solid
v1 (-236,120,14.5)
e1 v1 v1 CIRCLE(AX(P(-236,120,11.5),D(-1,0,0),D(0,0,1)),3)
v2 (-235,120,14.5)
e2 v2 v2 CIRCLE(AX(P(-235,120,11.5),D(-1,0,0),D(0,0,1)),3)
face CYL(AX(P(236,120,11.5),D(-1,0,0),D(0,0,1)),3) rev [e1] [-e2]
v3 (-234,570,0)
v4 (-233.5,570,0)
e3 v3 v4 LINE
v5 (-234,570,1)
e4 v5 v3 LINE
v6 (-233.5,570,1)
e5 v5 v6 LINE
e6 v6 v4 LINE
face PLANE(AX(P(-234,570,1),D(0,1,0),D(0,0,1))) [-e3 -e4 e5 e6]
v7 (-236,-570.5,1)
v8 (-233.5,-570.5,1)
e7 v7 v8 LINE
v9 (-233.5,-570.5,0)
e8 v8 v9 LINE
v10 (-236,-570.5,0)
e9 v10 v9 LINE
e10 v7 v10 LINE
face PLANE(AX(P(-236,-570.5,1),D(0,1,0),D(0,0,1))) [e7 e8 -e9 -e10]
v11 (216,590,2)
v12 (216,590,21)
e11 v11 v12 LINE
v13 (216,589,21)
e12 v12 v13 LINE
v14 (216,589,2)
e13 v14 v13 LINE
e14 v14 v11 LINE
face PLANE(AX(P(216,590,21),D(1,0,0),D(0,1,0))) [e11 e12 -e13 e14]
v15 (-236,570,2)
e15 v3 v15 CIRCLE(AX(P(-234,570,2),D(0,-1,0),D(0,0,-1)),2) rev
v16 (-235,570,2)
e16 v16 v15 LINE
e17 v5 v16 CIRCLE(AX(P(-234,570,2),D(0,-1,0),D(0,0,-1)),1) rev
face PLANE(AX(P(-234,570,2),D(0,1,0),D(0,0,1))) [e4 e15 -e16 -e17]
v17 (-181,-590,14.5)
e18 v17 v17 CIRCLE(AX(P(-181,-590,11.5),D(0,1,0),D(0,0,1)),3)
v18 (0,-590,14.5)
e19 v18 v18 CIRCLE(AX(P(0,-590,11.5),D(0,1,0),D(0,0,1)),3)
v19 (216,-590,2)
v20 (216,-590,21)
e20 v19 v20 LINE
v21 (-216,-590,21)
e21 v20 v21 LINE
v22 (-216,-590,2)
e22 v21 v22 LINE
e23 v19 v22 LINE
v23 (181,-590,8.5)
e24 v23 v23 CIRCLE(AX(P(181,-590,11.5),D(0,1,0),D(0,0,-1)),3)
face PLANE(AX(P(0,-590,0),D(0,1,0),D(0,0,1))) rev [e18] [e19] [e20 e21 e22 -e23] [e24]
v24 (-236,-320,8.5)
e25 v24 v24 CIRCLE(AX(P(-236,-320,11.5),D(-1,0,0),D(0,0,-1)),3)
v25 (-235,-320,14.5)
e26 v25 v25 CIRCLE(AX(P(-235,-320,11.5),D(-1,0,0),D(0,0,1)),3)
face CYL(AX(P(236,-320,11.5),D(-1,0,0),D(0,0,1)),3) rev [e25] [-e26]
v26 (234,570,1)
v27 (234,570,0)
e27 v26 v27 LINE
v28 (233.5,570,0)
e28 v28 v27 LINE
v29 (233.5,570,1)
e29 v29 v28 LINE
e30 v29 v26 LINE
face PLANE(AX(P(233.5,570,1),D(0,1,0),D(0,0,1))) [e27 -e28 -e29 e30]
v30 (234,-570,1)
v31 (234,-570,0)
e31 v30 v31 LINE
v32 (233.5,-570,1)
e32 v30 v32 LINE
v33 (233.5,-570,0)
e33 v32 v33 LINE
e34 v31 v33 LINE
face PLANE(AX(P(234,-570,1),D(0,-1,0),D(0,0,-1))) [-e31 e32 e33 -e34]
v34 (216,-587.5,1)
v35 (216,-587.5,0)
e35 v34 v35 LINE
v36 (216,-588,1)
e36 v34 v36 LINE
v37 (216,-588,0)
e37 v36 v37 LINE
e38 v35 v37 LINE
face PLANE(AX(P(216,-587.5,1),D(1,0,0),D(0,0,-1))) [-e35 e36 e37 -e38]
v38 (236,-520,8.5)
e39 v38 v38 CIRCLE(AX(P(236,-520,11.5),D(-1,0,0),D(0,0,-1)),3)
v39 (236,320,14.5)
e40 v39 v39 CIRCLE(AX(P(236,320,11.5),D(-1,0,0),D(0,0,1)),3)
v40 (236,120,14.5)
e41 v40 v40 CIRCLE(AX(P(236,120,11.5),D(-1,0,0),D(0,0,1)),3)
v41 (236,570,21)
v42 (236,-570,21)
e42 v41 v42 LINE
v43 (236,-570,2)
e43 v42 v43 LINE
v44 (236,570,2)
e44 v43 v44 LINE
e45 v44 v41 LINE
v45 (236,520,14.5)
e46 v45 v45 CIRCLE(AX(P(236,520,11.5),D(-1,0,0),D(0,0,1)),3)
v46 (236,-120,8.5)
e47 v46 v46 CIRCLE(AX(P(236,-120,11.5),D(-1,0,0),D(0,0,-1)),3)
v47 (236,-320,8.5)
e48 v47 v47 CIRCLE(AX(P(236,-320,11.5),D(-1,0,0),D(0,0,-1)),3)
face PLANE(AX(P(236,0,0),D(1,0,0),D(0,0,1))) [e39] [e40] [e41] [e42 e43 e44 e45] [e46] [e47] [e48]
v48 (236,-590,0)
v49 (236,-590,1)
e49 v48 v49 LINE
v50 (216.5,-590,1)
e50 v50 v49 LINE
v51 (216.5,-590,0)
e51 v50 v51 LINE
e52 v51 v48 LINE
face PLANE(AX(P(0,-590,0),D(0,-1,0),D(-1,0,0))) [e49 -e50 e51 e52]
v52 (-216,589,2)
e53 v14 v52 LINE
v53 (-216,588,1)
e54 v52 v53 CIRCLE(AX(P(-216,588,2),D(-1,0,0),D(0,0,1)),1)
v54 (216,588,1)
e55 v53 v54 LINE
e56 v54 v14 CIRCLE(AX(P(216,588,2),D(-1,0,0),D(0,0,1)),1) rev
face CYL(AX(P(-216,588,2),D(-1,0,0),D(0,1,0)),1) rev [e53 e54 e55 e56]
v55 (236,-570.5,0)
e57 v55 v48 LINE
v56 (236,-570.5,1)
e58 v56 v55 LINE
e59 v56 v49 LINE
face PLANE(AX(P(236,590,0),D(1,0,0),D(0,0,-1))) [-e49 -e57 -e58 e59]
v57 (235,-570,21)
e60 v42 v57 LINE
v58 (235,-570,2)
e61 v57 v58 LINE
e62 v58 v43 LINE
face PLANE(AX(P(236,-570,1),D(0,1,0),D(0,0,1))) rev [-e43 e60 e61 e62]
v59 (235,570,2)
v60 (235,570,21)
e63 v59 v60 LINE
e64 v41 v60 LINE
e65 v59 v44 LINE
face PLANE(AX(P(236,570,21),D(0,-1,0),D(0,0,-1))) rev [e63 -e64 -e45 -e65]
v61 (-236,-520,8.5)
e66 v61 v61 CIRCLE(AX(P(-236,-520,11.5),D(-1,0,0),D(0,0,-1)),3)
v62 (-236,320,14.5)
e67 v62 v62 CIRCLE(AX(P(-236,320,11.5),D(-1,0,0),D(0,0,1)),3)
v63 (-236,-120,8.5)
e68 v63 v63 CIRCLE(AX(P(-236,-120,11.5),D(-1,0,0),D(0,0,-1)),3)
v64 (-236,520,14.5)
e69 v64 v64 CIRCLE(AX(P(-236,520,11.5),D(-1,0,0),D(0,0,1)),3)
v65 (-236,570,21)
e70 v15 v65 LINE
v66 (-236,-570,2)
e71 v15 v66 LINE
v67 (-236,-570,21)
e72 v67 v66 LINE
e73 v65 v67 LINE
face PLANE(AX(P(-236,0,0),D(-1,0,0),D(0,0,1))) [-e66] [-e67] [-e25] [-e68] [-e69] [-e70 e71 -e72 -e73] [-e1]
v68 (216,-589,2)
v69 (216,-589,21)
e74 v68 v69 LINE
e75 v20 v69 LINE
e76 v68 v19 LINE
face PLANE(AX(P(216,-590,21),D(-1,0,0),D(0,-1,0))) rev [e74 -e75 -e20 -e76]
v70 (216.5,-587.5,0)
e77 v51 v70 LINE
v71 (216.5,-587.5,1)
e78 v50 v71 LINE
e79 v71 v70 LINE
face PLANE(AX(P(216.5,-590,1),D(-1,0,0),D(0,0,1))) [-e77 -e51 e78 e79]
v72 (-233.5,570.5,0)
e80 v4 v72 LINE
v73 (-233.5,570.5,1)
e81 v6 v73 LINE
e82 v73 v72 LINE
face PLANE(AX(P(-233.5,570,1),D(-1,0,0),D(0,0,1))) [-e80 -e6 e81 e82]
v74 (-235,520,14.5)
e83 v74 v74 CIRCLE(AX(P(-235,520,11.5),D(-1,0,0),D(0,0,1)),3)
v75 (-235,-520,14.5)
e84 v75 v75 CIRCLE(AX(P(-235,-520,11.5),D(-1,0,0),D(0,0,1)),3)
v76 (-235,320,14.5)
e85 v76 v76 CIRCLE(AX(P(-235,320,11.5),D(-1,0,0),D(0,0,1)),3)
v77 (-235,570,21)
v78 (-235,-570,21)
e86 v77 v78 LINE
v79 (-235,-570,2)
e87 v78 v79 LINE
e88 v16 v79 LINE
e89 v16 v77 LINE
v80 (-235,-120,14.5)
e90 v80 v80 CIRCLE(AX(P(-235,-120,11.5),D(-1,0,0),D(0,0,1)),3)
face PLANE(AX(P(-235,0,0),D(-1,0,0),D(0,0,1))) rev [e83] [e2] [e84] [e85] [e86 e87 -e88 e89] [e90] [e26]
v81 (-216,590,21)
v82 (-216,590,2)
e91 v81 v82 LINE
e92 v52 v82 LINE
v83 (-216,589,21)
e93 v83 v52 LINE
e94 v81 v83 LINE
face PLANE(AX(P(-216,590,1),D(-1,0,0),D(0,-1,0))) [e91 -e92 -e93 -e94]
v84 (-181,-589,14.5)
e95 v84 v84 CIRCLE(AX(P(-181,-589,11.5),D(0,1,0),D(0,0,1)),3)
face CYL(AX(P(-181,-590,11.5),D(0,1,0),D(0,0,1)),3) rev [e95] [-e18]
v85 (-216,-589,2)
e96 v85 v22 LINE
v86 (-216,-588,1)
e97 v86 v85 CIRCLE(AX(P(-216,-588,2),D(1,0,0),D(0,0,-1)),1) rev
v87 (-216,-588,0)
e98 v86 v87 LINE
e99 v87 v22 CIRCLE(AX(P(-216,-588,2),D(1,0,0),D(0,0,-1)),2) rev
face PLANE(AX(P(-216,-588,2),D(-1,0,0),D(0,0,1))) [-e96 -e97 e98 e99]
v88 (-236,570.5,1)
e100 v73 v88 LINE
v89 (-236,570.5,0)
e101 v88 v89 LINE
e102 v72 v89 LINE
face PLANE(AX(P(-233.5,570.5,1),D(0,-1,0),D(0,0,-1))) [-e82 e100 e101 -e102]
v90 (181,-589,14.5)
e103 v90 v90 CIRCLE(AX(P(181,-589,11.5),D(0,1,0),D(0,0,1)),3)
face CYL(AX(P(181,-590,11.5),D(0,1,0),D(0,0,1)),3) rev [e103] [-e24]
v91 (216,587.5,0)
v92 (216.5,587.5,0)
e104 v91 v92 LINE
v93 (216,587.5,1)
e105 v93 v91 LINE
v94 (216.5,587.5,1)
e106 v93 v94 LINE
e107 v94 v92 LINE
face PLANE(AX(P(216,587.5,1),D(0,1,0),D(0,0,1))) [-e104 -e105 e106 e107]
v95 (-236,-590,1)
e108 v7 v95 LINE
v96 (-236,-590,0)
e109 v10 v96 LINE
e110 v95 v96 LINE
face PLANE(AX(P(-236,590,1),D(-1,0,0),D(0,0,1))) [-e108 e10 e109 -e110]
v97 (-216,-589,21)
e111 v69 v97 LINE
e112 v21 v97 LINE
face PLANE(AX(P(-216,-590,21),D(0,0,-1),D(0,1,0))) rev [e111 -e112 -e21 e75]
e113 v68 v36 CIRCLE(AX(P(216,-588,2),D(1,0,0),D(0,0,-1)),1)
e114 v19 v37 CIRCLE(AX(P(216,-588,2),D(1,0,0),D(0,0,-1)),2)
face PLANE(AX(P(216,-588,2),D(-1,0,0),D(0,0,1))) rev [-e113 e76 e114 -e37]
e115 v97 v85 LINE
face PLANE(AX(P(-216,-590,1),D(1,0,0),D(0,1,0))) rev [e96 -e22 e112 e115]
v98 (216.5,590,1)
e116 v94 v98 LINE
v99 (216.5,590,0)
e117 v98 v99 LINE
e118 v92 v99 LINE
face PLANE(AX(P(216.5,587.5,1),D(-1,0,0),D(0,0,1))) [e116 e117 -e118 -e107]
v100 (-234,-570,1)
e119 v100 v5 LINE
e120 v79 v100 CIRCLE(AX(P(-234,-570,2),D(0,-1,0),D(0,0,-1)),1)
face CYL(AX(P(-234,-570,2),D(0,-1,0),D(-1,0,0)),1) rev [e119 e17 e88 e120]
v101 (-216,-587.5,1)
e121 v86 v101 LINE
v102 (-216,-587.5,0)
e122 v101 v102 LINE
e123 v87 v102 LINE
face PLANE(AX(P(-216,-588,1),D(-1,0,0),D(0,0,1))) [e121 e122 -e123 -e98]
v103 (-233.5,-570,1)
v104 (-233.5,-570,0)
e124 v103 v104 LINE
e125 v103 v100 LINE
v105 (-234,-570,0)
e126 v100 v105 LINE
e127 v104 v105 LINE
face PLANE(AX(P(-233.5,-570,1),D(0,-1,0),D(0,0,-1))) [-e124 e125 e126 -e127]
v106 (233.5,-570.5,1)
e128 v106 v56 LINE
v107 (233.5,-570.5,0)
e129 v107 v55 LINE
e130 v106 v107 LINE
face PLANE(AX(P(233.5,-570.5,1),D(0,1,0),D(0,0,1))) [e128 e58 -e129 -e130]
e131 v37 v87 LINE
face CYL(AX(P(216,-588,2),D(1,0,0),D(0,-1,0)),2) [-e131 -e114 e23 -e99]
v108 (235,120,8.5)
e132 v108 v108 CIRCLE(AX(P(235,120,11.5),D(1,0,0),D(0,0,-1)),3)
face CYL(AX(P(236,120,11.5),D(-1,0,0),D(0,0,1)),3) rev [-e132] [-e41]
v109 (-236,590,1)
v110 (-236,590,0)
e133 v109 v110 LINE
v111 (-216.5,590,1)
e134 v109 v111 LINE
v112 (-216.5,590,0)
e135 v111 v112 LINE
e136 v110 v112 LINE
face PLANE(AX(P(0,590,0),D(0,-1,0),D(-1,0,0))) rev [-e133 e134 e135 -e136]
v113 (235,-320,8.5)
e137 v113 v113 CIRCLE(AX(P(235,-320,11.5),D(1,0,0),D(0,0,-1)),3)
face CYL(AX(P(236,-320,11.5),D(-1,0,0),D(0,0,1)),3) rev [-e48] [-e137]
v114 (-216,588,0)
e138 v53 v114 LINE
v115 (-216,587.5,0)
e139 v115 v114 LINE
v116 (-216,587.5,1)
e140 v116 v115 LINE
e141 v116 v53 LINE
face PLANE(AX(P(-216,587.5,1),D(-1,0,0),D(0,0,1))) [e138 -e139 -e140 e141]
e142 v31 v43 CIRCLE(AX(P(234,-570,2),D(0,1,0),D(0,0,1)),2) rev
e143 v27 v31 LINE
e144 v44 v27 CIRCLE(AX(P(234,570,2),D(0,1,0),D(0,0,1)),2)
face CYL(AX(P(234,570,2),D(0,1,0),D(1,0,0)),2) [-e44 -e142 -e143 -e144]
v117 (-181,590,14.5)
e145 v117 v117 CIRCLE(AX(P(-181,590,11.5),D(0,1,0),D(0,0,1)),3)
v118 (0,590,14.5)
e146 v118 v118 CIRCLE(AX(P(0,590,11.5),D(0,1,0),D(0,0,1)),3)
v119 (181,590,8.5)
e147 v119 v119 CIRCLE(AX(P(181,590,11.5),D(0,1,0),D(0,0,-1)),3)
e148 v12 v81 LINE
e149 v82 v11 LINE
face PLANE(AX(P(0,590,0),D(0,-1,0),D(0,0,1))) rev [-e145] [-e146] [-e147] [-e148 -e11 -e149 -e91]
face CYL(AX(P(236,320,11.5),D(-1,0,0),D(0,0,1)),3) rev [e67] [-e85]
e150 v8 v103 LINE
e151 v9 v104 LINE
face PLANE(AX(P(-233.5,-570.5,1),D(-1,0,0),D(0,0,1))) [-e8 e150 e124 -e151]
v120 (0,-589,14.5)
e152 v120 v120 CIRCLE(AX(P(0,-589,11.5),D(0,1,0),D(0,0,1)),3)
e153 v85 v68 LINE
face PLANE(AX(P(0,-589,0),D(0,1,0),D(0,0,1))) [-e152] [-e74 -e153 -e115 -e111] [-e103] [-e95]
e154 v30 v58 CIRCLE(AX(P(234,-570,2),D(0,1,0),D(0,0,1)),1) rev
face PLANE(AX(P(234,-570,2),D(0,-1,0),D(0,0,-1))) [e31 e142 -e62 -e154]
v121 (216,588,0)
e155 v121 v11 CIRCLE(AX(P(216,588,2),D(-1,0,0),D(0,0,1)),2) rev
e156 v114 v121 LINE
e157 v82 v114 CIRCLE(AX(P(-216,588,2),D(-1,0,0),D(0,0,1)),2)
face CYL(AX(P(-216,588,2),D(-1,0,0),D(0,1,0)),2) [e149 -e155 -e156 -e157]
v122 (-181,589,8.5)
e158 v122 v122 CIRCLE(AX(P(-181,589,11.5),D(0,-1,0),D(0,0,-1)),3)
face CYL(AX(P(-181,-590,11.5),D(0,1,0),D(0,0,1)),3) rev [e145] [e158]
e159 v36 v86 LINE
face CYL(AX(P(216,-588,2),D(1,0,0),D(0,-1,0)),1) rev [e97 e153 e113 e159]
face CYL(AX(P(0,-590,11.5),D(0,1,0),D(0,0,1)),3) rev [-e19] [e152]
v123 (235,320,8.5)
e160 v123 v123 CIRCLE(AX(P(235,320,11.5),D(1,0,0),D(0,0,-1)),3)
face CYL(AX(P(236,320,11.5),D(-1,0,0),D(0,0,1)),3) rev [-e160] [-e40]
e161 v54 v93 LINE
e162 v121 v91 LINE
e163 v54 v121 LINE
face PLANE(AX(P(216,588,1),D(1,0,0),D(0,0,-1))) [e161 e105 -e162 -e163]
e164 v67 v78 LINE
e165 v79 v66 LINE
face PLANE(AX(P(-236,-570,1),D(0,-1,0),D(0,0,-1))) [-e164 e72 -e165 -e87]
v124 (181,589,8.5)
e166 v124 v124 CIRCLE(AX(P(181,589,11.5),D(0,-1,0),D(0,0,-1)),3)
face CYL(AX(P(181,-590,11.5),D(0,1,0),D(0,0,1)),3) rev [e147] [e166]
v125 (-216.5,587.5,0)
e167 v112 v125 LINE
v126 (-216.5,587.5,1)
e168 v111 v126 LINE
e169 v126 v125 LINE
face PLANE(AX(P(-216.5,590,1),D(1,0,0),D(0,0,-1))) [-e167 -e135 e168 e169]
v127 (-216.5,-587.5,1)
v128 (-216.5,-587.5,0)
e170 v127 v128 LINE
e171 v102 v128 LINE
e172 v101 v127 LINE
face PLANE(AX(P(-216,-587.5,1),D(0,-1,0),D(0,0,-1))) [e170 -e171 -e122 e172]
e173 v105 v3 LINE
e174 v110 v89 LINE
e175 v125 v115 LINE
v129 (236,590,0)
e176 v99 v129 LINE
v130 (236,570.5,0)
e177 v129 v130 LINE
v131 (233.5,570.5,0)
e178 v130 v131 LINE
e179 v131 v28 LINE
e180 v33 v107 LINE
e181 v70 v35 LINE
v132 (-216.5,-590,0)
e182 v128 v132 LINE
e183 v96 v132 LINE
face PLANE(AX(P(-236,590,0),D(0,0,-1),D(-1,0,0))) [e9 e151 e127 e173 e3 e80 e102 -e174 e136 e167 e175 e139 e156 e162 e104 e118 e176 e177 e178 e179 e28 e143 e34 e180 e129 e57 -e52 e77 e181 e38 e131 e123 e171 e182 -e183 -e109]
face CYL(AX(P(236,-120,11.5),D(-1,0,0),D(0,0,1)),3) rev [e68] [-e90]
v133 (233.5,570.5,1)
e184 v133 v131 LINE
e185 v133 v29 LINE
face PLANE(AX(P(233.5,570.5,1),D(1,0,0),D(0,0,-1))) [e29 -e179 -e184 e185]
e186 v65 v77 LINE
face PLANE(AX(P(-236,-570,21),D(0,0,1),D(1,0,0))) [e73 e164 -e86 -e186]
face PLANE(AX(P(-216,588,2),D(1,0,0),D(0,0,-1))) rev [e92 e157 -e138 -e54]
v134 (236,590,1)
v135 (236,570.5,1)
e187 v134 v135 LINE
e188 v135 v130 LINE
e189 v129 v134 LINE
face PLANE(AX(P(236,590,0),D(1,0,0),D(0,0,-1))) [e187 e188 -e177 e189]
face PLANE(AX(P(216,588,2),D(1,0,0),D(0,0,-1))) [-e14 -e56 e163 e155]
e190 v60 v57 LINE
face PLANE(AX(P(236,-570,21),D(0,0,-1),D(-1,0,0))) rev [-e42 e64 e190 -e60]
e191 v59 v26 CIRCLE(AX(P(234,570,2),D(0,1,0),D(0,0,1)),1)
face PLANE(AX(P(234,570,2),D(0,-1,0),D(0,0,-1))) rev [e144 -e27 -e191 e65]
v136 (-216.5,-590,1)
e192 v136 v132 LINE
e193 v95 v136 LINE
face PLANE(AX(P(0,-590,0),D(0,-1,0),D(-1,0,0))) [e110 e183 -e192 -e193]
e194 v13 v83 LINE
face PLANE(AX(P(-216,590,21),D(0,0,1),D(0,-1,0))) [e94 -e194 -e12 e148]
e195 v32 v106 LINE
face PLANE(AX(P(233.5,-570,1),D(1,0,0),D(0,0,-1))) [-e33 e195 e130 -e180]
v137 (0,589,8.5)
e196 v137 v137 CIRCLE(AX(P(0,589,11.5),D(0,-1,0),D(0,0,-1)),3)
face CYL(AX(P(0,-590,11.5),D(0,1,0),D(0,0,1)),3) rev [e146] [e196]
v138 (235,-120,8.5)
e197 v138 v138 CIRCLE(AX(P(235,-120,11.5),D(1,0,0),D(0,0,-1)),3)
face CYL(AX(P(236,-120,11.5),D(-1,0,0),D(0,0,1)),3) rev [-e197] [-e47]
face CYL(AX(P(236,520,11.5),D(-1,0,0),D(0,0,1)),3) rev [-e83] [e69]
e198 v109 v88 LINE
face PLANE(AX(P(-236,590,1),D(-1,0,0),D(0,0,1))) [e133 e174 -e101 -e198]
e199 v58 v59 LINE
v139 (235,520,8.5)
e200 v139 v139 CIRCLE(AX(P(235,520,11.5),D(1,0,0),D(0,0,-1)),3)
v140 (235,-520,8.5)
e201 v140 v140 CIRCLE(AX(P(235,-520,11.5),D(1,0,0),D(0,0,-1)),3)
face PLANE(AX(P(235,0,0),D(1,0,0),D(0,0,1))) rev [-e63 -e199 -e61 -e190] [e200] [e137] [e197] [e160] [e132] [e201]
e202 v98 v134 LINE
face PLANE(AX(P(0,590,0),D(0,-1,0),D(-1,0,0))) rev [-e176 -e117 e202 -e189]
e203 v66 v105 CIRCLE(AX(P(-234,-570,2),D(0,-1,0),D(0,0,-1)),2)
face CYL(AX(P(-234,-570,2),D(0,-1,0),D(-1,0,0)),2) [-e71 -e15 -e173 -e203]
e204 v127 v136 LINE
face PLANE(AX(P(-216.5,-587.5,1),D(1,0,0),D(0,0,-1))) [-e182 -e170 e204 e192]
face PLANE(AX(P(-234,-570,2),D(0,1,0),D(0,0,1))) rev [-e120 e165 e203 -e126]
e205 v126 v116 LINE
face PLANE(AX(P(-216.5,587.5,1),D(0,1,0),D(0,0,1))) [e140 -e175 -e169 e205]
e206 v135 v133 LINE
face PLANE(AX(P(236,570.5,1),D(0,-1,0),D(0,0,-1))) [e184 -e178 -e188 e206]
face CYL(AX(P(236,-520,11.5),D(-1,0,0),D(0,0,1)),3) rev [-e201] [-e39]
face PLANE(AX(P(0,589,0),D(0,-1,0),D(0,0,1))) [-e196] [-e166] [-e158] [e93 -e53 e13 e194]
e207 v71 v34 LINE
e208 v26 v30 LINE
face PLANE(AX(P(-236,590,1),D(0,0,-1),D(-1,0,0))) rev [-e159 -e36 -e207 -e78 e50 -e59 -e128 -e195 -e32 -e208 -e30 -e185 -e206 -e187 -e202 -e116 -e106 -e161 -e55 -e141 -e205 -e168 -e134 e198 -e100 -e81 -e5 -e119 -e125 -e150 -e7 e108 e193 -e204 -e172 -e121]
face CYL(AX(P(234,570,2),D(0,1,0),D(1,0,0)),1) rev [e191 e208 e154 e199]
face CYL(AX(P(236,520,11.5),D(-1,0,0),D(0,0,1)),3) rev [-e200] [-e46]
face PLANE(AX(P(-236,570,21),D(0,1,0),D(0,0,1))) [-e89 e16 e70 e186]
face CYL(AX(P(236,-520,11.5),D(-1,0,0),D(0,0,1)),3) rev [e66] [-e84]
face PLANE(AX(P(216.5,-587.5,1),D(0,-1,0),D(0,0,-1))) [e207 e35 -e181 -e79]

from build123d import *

# Parameters (mm, degrees)
SKETCH1_W                     = 472
SKETCH1_H                     = 1
BASE_FLANGE1_DEPTH            = 590
EDGE_FLANGE1_STRIP_W          = 6
EDGE_FLANGE1_STRIP_H          = 1
EDGE_FLANGE1_STRIP_CUT_DEPTH  = 432
EDGE_FLANGE1_RELIEF_W         = 6.5
EDGE_FLANGE1_RELIEF_H         = 0.5
EDGE_FLANGE1_RELIEF_CUT_DEPTH = 1
EDGE_FLANGE1_DEPTH            = 432
EDGE_FLANGE2_STRIP_W          = 6
EDGE_FLANGE2_STRIP_H          = 1
EDGE_FLANGE2_STRIP_CUT_DEPTH  = 1140
EDGE_FLANGE2_RELIEF_W         = 6.5
EDGE_FLANGE2_RELIEF_H         = 0.5
EDGE_FLANGE2_RELIEF_CUT_DEPTH = 1
EDGE_FLANGE2_DEPTH            = 1140
SKETCH16_R                    = 3
CUT_EXTRUDE1_DEPTH            = 756.860436853
SKETCH18_R                    = 3
CUT_EXTRUDE2_DEPTH            = 1204.551826886


# Sheet-metal steps are written as plain solids
with BuildPart() as part:
    # Sketch1 → Base-Flange1 (new, symmetric)
    with BuildSketch(Plane(origin=(0, 0, 0), x_dir=(1, 0, 0), z_dir=(0, 1, 0))):
        with Locations((0, -0.5)):
            Rectangle(SKETCH1_W, SKETCH1_H)
    extrude(amount=BASE_FLANGE1_DEPTH, both=True)

    # Edge-Flange1 strip (across the edge) → Edge-Flange1 strip cut (cut)
    with BuildSketch(Plane(origin=(-216, -590, 1), x_dir=(0, 1, 0), z_dir=(1, 0, 0))):
        with Locations((-1, -0.5)):
            Rectangle(EDGE_FLANGE1_STRIP_W, EDGE_FLANGE1_STRIP_H)
    edge_flange1_strip_cut = extrude(amount=EDGE_FLANGE1_STRIP_CUT_DEPTH, mode=Mode.SUBTRACT)

    # Edge-Flange1 relief (on the sheet) → Edge-Flange1 relief cut (cut)
    with BuildSketch(Plane(origin=(-216, -588, 1), x_dir=(0, 1, 0), z_dir=(0, 0, 1))):
        with Locations((-2.75, 0.25)):
            Rectangle(EDGE_FLANGE1_RELIEF_W, EDGE_FLANGE1_RELIEF_H)
        with Locations((-2.75, -432.25)):
            Rectangle(EDGE_FLANGE1_RELIEF_W, EDGE_FLANGE1_RELIEF_H)
    edge_flange1_relief_cut = extrude(amount=-EDGE_FLANGE1_RELIEF_CUT_DEPTH, mode=Mode.SUBTRACT)

    # Edge-Flange1 section (across the edge) → Edge-Flange1 (add)
    with BuildSketch(Plane(origin=(-216, -590, 1), x_dir=(0, 1, 0), z_dir=(1, 0, 0))):
        with BuildLine():
            Line((0, 1), (0, 20))
            Line((0, 20), (1, 20))
            Line((1, 20), (1, 1))
            ThreePointArc((1, 1), (1.292893219, 0.292893219), (2, 0))
            Line((2, 0), (2, -1))
            ThreePointArc((2, -1), (0.585786438, -0.414213562), (0, 1))
        make_face()
    edge_flange1 = extrude(amount=EDGE_FLANGE1_DEPTH)

    # Mirror1: Edge-Flange1 strip cut, Edge-Flange1 relief cut, Edge-Flange1 across plane
    add(edge_flange1_strip_cut.mirror(Plane.ZX), mode=Mode.SUBTRACT)
    add(edge_flange1_relief_cut.mirror(Plane.ZX), mode=Mode.SUBTRACT)
    add(edge_flange1.mirror(Plane.ZX))

    # Edge-Flange2 strip (across the edge) → Edge-Flange2 strip cut (cut)
    with BuildSketch(Plane(origin=(-236, 570, 1), x_dir=(1, 0, 0), z_dir=(0, -1, 0))):
        with Locations((-1, -0.5)):
            Rectangle(EDGE_FLANGE2_STRIP_W, EDGE_FLANGE2_STRIP_H)
    edge_flange2_strip_cut = extrude(amount=EDGE_FLANGE2_STRIP_CUT_DEPTH, mode=Mode.SUBTRACT)

    # Edge-Flange2 relief (on the sheet) → Edge-Flange2 relief cut (cut)
    with BuildSketch(Plane(origin=(-234, 570, 1), x_dir=(1, 0, 0), z_dir=(0, 0, 1))):
        with Locations((-2.75, 0.25)):
            Rectangle(EDGE_FLANGE2_RELIEF_W, EDGE_FLANGE2_RELIEF_H)
        with Locations((-2.75, -1140.25)):
            Rectangle(EDGE_FLANGE2_RELIEF_W, EDGE_FLANGE2_RELIEF_H)
    edge_flange2_relief_cut = extrude(amount=-EDGE_FLANGE2_RELIEF_CUT_DEPTH, mode=Mode.SUBTRACT)

    # Edge-Flange2 section (across the edge) → Edge-Flange2 (add)
    with BuildSketch(Plane(origin=(-236, 570, 1), x_dir=(1, 0, 0), z_dir=(0, -1, 0))):
        with BuildLine():
            Line((0, 1), (0, 20))
            Line((0, 20), (1, 20))
            Line((1, 20), (1, 1))
            ThreePointArc((1, 1), (1.292893219, 0.292893219), (2, 0))
            Line((2, 0), (2, -1))
            ThreePointArc((2, -1), (0.585786438, -0.414213562), (0, 1))
        make_face()
    edge_flange2 = extrude(amount=EDGE_FLANGE2_DEPTH)

    # Mirror2: Edge-Flange2 strip cut, Edge-Flange2 relief cut, Edge-Flange2 across plane
    add(edge_flange2_strip_cut.mirror(Plane(origin=(0, 0, 0), x_dir=(0, 0, 1), z_dir=(1, 0, 0))), mode=Mode.SUBTRACT)
    add(edge_flange2_relief_cut.mirror(Plane(origin=(0, 0, 0), x_dir=(0, 0, 1), z_dir=(1, 0, 0))), mode=Mode.SUBTRACT)
    add(edge_flange2.mirror(Plane(origin=(0, 0, 0), x_dir=(0, 0, 1), z_dir=(1, 0, 0))))

    # Sketch16 → Cut-Extrude1 (cut, through all)
    with BuildSketch(Plane.ZY.offset(236)):
        with Locations((11.5, 520)):
            Circle(SKETCH16_R)
        with Locations((11.5, 320)):
            Circle(SKETCH16_R)
        with Locations((11.5, 120)):
            Circle(SKETCH16_R)
        with Locations(Location((11.5, -120, 0), (0, 0, 180))):
            Circle(SKETCH16_R)
        with Locations(Location((11.5, -320, 0), (0, 0, 180))):
            Circle(SKETCH16_R)
        with Locations(Location((11.5, -520, 0), (0, 0, 180))):
            Circle(SKETCH16_R)
    extrude(amount=-CUT_EXTRUDE1_DEPTH, mode=Mode.SUBTRACT)

    # Sketch18 → Cut-Extrude2 (cut, through all)
    with BuildSketch(Plane(origin=(0, 590, 0), x_dir=(1, 0, 0), z_dir=(0, 1, 0))):
        with Locations(Location((-181, -11.5, 0), (0, 0, 270))):
            Circle(SKETCH18_R)
        with Locations(Location((0, -11.5, 0), (0, 0, 270))):
            Circle(SKETCH18_R)
        with Locations(Location((181, -11.5, 0), (0, 0, 90))):
            Circle(SKETCH18_R)
    extrude(amount=-CUT_EXTRUDE2_DEPTH, mode=Mode.SUBTRACT)


solid = part.part
